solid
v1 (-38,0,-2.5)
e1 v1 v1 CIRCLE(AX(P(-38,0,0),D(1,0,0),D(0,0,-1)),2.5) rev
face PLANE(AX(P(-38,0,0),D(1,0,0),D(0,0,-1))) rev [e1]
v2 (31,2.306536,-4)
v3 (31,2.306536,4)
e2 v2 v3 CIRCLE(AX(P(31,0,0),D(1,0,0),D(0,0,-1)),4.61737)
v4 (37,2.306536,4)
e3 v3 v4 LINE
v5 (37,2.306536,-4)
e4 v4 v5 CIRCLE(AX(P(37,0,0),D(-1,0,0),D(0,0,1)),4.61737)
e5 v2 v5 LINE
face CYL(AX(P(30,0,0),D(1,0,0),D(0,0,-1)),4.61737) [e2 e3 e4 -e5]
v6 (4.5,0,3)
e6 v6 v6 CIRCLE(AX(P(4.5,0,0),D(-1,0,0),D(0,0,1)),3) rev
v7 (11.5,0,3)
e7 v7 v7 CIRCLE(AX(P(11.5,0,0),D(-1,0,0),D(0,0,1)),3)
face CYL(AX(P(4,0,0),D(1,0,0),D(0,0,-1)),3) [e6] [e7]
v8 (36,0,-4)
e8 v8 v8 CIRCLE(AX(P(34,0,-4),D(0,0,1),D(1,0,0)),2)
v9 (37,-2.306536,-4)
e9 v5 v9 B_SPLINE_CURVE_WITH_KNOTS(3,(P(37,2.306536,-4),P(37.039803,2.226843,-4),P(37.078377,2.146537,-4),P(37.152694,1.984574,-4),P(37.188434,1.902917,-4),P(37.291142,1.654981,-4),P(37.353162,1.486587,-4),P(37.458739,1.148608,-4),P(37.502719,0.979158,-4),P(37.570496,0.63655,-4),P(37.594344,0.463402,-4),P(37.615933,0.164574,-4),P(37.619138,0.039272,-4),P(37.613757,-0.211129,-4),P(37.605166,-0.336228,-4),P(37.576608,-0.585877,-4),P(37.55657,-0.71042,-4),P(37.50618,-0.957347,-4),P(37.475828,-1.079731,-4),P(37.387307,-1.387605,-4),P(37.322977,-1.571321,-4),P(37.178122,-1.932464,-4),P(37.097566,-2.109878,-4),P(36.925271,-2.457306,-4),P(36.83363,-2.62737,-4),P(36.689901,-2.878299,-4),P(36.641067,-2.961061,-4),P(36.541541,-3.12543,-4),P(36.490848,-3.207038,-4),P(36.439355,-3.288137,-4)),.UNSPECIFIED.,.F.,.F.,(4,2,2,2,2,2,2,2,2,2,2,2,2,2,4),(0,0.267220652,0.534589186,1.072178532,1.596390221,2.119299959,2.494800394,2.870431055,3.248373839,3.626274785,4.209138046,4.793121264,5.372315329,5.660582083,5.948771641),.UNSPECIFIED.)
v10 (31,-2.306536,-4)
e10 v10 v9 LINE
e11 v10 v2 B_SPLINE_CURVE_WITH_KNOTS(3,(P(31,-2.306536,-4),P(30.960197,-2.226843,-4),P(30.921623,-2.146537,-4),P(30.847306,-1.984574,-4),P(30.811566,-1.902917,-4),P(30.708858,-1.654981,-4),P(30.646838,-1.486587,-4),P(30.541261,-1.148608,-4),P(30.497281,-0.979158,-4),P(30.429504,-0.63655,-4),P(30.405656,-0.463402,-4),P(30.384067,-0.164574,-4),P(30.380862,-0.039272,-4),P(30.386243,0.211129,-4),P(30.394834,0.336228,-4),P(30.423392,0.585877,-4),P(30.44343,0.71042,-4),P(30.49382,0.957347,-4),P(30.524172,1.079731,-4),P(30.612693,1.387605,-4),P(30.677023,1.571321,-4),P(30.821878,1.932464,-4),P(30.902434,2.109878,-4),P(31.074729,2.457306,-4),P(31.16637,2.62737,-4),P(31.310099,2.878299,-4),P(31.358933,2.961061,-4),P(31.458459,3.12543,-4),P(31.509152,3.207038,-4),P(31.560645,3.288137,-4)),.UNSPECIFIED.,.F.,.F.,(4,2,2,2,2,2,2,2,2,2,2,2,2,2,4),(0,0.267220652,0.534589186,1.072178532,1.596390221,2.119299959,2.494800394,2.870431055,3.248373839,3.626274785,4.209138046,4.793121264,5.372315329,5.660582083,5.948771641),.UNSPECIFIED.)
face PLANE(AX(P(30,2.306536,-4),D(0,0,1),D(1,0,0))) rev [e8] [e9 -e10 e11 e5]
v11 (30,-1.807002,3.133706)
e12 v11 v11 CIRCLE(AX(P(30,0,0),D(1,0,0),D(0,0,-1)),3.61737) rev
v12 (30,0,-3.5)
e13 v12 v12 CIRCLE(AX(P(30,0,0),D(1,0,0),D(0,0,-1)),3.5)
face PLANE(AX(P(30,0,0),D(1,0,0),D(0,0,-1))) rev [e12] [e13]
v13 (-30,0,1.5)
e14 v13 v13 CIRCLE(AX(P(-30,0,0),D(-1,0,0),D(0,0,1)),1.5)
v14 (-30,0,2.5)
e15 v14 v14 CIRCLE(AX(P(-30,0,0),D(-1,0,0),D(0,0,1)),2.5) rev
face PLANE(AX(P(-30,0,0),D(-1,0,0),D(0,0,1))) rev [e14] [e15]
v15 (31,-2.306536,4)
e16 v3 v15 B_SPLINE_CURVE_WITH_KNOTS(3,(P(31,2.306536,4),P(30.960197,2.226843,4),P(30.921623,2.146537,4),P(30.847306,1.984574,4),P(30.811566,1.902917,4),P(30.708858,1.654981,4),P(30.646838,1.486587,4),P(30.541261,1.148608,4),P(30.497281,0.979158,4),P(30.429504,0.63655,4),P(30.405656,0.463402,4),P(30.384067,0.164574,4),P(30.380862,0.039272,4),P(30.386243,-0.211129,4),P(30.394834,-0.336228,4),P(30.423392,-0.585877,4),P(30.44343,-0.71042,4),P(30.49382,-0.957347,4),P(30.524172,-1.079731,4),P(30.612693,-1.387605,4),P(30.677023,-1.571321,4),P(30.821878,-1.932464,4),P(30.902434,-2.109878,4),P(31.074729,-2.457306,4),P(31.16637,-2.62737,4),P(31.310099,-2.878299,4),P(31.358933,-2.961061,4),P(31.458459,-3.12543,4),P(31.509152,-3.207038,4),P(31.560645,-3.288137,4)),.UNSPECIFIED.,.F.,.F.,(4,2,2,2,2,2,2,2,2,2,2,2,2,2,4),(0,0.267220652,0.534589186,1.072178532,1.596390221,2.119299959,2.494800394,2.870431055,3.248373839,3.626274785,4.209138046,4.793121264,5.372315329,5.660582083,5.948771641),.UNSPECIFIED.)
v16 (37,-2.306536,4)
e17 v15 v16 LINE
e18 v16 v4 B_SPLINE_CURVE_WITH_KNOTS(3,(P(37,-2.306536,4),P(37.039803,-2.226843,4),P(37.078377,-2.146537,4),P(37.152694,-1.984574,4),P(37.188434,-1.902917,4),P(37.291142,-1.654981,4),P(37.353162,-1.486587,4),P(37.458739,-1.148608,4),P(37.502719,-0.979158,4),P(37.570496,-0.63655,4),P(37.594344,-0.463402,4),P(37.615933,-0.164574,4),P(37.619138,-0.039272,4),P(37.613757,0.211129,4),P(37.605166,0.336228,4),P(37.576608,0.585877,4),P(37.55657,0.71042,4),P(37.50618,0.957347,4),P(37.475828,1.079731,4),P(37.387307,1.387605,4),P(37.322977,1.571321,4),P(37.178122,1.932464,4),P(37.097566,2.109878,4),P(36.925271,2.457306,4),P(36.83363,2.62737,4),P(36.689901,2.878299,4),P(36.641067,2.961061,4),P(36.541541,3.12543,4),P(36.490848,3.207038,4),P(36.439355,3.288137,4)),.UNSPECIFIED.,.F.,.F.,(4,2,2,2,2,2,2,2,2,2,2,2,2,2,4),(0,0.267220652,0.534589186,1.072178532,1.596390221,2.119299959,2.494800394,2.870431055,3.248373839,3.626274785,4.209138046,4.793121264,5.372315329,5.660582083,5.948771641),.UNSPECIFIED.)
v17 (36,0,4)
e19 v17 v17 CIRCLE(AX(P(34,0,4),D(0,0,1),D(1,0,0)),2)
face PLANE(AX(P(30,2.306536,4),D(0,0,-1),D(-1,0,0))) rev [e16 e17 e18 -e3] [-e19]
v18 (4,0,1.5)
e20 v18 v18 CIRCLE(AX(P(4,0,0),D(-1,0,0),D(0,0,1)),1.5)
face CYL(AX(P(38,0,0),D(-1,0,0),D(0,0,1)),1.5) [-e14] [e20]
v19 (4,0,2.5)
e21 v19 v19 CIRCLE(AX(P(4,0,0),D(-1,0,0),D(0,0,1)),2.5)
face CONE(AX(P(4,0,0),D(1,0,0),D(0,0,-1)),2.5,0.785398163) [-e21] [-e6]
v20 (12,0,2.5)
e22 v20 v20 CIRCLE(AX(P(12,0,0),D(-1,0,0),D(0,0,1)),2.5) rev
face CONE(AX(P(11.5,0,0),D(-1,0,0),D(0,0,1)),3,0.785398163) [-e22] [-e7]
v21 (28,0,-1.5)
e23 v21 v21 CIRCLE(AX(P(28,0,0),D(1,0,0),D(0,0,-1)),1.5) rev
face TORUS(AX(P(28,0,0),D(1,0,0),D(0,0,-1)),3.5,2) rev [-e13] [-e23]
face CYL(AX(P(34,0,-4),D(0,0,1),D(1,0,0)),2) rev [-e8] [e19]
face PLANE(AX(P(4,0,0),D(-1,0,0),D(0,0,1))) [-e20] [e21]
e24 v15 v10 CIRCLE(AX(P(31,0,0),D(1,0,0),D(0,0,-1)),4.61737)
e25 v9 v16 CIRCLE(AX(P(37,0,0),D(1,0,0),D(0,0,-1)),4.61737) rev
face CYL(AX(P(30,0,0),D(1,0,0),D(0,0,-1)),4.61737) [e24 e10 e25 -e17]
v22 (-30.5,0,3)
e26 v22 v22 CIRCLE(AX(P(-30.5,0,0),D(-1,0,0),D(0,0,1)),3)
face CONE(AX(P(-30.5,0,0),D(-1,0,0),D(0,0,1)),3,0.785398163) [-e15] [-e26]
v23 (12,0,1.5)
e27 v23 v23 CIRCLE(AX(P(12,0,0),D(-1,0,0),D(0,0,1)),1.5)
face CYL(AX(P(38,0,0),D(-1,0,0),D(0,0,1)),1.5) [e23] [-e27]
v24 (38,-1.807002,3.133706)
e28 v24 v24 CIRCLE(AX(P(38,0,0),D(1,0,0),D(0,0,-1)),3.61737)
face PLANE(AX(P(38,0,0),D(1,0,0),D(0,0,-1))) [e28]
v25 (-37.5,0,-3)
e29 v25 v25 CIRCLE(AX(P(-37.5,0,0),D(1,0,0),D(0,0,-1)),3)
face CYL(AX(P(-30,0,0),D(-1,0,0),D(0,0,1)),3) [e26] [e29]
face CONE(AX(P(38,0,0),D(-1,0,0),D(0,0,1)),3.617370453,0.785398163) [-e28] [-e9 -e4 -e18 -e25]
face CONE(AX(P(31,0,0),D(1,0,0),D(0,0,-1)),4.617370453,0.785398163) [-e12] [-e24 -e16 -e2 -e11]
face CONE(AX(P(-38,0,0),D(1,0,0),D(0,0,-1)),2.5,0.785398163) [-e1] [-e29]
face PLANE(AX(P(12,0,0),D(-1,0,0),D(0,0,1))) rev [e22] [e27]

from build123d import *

# Parameters (mm, degrees)
SKETCH1_R           = 1.5
BOSS_EXTRUDE1_DEPTH = 38
SKETCH2_R           = 3
BOSS_EXTRUDE2_DEPTH = 8
BOSS_EXTRUDE3_START = -42
SKETCH2_2_R         = 3
BOSS_EXTRUDE3_DEPTH = 8
CHAMFER1_SIZE       = 0.5
SKETCH3_R           = 4.617370453
BOSS_EXTRUDE4_DEPTH = 8
CUT_EXTRUDE1_DEPTH  = 8
SKETCH5_R           = 2
CUT_EXTRUDE2_DEPTH  = 40.1065226
CHAMFER2_SIZE       = 1
FILLET1_R           = 2


with BuildPart() as part:
    # Sketch1 → Boss-Extrude1 (new, symmetric)
    with BuildSketch(Plane(origin=(0, 0, 0), x_dir=(0, 0, -1), z_dir=(1, 0, 0))):
        Circle(SKETCH1_R)
    extrude(amount=BOSS_EXTRUDE1_DEPTH, both=True)

    # Sketch2 → Boss-Extrude2 (add)
    with BuildSketch(Plane.ZY.offset(38)):
        Circle(SKETCH2_R)
    extrude(amount=-BOSS_EXTRUDE2_DEPTH)

    # Sketch2<2> → Boss-Extrude3 (add)
    with BuildSketch(Plane.ZY.offset(38).offset(BOSS_EXTRUDE3_START)):
        Circle(SKETCH2_2_R)
    extrude(amount=-BOSS_EXTRUDE3_DEPTH)

    # Chamfer1
    chamfer1_edges = [part.edges().sort_by_distance(p)[0] for p in [
        (12, 0, -3),
        (4, 0, -3),
        (-30, 0, -3),
        (-38, 0, -3),
    ]]
    chamfer(chamfer1_edges, length=CHAMFER1_SIZE)

    # Sketch3 → Boss-Extrude4 (add)
    with BuildSketch(Plane(origin=(38, 0, 0), x_dir=(0, 0, -1), z_dir=(1, 0, 0))):
        Circle(SKETCH3_R)
    extrude(amount=-BOSS_EXTRUDE4_DEPTH)

    # Sketch4 → Cut-Extrude1 (cut)
    with BuildSketch(Plane(origin=(38, 0, 0), x_dir=(0, 0, -1), z_dir=(1, 0, 0))):
        with BuildLine():
            Line((-4, 2.306536342), (-4, -2.306536342))
            ThreePointArc((-4, -2.306536342), (-4.617370453, 0), (-4, 2.306536342))
        make_face()
        with BuildLine():
            Line((4, 2.306536342), (4, -2.306536342))
            ThreePointArc((4, -2.306536342), (4.617370453, 0), (4, 2.306536342))
        make_face()
    extrude(amount=-CUT_EXTRUDE1_DEPTH, mode=Mode.SUBTRACT)

    # Sketch5 → Cut-Extrude2 (cut, through all)
    with BuildSketch(Plane.XY.offset(4)):
        with Locations((34, 0)):
            Circle(SKETCH5_R)
    extrude(amount=-CUT_EXTRUDE2_DEPTH, mode=Mode.SUBTRACT)

    # Chamfer2
    # the kernel refuses this chamfer: 1 mm, written as the material it takes off along each edge
    with BuildSketch(Plane(origin=(30, 0, 0), x_dir=(0, -0.03428839370133285, -0.9994119801450163), z_dir=(0, -0.9994119801450163, 0.03428839370133285))) as chamfer2_piece_1:
        Polygon((4.617370453 - CHAMFER2_SIZE, 0), (4.617370453, CHAMFER2_SIZE), (4.617370453, 0), align=None)
    revolve(axis=Axis((30, 0, 0), (1, 0, 0)), revolution_arc=183.929930813, mode=Mode.SUBTRACT)
    with BuildSketch(Plane(origin=(38, 0, 0), x_dir=(0, -0.0342883937013343, -0.9994119801450161), z_dir=(0, -0.9994119801450161, 0.0342883937013343))) as chamfer2_piece_2:
        Polygon((4.617370453, -CHAMFER2_SIZE), (4.617370453 - CHAMFER2_SIZE, 0), (4.617370453, 0), align=None)
    revolve(axis=Axis((38, 0, 0), (1, 0, 0)), revolution_arc=183.929930813, mode=Mode.SUBTRACT)
    with BuildSketch(Plane(origin=(38, 0, 0), x_dir=(0, 0.03428839370133442, 0.9994119801450161), z_dir=(0, 0.9994119801450161, -0.03428839370133442))) as chamfer2_piece_3:
        Polygon((4.617370453, -CHAMFER2_SIZE), (4.617370453 - CHAMFER2_SIZE, 0), (4.617370453, 0), align=None)
    revolve(axis=Axis((38, 0, 0), (1, 0, 0)), revolution_arc=183.929930813, mode=Mode.SUBTRACT)
    with BuildSketch(Plane(origin=(30, 0, 0), x_dir=(0, 0.034288393701332645, 0.9994119801450163), z_dir=(0, 0.9994119801450163, -0.034288393701332645))) as chamfer2_piece_4:
        Polygon((4.617370453 - CHAMFER2_SIZE, 0), (4.617370453, CHAMFER2_SIZE), (4.617370453, 0), align=None)
    revolve(axis=Axis((30, 0, 0), (1, 0, 0)), revolution_arc=183.929930813, mode=Mode.SUBTRACT)

    # Fillet1
    fillet1_edges = [part.edges().sort_by_distance(p)[0] for p in [
        (30, 0, 1.5),
    ]]
    fillet(fillet1_edges, radius=FILLET1_R)


solid = part.part
